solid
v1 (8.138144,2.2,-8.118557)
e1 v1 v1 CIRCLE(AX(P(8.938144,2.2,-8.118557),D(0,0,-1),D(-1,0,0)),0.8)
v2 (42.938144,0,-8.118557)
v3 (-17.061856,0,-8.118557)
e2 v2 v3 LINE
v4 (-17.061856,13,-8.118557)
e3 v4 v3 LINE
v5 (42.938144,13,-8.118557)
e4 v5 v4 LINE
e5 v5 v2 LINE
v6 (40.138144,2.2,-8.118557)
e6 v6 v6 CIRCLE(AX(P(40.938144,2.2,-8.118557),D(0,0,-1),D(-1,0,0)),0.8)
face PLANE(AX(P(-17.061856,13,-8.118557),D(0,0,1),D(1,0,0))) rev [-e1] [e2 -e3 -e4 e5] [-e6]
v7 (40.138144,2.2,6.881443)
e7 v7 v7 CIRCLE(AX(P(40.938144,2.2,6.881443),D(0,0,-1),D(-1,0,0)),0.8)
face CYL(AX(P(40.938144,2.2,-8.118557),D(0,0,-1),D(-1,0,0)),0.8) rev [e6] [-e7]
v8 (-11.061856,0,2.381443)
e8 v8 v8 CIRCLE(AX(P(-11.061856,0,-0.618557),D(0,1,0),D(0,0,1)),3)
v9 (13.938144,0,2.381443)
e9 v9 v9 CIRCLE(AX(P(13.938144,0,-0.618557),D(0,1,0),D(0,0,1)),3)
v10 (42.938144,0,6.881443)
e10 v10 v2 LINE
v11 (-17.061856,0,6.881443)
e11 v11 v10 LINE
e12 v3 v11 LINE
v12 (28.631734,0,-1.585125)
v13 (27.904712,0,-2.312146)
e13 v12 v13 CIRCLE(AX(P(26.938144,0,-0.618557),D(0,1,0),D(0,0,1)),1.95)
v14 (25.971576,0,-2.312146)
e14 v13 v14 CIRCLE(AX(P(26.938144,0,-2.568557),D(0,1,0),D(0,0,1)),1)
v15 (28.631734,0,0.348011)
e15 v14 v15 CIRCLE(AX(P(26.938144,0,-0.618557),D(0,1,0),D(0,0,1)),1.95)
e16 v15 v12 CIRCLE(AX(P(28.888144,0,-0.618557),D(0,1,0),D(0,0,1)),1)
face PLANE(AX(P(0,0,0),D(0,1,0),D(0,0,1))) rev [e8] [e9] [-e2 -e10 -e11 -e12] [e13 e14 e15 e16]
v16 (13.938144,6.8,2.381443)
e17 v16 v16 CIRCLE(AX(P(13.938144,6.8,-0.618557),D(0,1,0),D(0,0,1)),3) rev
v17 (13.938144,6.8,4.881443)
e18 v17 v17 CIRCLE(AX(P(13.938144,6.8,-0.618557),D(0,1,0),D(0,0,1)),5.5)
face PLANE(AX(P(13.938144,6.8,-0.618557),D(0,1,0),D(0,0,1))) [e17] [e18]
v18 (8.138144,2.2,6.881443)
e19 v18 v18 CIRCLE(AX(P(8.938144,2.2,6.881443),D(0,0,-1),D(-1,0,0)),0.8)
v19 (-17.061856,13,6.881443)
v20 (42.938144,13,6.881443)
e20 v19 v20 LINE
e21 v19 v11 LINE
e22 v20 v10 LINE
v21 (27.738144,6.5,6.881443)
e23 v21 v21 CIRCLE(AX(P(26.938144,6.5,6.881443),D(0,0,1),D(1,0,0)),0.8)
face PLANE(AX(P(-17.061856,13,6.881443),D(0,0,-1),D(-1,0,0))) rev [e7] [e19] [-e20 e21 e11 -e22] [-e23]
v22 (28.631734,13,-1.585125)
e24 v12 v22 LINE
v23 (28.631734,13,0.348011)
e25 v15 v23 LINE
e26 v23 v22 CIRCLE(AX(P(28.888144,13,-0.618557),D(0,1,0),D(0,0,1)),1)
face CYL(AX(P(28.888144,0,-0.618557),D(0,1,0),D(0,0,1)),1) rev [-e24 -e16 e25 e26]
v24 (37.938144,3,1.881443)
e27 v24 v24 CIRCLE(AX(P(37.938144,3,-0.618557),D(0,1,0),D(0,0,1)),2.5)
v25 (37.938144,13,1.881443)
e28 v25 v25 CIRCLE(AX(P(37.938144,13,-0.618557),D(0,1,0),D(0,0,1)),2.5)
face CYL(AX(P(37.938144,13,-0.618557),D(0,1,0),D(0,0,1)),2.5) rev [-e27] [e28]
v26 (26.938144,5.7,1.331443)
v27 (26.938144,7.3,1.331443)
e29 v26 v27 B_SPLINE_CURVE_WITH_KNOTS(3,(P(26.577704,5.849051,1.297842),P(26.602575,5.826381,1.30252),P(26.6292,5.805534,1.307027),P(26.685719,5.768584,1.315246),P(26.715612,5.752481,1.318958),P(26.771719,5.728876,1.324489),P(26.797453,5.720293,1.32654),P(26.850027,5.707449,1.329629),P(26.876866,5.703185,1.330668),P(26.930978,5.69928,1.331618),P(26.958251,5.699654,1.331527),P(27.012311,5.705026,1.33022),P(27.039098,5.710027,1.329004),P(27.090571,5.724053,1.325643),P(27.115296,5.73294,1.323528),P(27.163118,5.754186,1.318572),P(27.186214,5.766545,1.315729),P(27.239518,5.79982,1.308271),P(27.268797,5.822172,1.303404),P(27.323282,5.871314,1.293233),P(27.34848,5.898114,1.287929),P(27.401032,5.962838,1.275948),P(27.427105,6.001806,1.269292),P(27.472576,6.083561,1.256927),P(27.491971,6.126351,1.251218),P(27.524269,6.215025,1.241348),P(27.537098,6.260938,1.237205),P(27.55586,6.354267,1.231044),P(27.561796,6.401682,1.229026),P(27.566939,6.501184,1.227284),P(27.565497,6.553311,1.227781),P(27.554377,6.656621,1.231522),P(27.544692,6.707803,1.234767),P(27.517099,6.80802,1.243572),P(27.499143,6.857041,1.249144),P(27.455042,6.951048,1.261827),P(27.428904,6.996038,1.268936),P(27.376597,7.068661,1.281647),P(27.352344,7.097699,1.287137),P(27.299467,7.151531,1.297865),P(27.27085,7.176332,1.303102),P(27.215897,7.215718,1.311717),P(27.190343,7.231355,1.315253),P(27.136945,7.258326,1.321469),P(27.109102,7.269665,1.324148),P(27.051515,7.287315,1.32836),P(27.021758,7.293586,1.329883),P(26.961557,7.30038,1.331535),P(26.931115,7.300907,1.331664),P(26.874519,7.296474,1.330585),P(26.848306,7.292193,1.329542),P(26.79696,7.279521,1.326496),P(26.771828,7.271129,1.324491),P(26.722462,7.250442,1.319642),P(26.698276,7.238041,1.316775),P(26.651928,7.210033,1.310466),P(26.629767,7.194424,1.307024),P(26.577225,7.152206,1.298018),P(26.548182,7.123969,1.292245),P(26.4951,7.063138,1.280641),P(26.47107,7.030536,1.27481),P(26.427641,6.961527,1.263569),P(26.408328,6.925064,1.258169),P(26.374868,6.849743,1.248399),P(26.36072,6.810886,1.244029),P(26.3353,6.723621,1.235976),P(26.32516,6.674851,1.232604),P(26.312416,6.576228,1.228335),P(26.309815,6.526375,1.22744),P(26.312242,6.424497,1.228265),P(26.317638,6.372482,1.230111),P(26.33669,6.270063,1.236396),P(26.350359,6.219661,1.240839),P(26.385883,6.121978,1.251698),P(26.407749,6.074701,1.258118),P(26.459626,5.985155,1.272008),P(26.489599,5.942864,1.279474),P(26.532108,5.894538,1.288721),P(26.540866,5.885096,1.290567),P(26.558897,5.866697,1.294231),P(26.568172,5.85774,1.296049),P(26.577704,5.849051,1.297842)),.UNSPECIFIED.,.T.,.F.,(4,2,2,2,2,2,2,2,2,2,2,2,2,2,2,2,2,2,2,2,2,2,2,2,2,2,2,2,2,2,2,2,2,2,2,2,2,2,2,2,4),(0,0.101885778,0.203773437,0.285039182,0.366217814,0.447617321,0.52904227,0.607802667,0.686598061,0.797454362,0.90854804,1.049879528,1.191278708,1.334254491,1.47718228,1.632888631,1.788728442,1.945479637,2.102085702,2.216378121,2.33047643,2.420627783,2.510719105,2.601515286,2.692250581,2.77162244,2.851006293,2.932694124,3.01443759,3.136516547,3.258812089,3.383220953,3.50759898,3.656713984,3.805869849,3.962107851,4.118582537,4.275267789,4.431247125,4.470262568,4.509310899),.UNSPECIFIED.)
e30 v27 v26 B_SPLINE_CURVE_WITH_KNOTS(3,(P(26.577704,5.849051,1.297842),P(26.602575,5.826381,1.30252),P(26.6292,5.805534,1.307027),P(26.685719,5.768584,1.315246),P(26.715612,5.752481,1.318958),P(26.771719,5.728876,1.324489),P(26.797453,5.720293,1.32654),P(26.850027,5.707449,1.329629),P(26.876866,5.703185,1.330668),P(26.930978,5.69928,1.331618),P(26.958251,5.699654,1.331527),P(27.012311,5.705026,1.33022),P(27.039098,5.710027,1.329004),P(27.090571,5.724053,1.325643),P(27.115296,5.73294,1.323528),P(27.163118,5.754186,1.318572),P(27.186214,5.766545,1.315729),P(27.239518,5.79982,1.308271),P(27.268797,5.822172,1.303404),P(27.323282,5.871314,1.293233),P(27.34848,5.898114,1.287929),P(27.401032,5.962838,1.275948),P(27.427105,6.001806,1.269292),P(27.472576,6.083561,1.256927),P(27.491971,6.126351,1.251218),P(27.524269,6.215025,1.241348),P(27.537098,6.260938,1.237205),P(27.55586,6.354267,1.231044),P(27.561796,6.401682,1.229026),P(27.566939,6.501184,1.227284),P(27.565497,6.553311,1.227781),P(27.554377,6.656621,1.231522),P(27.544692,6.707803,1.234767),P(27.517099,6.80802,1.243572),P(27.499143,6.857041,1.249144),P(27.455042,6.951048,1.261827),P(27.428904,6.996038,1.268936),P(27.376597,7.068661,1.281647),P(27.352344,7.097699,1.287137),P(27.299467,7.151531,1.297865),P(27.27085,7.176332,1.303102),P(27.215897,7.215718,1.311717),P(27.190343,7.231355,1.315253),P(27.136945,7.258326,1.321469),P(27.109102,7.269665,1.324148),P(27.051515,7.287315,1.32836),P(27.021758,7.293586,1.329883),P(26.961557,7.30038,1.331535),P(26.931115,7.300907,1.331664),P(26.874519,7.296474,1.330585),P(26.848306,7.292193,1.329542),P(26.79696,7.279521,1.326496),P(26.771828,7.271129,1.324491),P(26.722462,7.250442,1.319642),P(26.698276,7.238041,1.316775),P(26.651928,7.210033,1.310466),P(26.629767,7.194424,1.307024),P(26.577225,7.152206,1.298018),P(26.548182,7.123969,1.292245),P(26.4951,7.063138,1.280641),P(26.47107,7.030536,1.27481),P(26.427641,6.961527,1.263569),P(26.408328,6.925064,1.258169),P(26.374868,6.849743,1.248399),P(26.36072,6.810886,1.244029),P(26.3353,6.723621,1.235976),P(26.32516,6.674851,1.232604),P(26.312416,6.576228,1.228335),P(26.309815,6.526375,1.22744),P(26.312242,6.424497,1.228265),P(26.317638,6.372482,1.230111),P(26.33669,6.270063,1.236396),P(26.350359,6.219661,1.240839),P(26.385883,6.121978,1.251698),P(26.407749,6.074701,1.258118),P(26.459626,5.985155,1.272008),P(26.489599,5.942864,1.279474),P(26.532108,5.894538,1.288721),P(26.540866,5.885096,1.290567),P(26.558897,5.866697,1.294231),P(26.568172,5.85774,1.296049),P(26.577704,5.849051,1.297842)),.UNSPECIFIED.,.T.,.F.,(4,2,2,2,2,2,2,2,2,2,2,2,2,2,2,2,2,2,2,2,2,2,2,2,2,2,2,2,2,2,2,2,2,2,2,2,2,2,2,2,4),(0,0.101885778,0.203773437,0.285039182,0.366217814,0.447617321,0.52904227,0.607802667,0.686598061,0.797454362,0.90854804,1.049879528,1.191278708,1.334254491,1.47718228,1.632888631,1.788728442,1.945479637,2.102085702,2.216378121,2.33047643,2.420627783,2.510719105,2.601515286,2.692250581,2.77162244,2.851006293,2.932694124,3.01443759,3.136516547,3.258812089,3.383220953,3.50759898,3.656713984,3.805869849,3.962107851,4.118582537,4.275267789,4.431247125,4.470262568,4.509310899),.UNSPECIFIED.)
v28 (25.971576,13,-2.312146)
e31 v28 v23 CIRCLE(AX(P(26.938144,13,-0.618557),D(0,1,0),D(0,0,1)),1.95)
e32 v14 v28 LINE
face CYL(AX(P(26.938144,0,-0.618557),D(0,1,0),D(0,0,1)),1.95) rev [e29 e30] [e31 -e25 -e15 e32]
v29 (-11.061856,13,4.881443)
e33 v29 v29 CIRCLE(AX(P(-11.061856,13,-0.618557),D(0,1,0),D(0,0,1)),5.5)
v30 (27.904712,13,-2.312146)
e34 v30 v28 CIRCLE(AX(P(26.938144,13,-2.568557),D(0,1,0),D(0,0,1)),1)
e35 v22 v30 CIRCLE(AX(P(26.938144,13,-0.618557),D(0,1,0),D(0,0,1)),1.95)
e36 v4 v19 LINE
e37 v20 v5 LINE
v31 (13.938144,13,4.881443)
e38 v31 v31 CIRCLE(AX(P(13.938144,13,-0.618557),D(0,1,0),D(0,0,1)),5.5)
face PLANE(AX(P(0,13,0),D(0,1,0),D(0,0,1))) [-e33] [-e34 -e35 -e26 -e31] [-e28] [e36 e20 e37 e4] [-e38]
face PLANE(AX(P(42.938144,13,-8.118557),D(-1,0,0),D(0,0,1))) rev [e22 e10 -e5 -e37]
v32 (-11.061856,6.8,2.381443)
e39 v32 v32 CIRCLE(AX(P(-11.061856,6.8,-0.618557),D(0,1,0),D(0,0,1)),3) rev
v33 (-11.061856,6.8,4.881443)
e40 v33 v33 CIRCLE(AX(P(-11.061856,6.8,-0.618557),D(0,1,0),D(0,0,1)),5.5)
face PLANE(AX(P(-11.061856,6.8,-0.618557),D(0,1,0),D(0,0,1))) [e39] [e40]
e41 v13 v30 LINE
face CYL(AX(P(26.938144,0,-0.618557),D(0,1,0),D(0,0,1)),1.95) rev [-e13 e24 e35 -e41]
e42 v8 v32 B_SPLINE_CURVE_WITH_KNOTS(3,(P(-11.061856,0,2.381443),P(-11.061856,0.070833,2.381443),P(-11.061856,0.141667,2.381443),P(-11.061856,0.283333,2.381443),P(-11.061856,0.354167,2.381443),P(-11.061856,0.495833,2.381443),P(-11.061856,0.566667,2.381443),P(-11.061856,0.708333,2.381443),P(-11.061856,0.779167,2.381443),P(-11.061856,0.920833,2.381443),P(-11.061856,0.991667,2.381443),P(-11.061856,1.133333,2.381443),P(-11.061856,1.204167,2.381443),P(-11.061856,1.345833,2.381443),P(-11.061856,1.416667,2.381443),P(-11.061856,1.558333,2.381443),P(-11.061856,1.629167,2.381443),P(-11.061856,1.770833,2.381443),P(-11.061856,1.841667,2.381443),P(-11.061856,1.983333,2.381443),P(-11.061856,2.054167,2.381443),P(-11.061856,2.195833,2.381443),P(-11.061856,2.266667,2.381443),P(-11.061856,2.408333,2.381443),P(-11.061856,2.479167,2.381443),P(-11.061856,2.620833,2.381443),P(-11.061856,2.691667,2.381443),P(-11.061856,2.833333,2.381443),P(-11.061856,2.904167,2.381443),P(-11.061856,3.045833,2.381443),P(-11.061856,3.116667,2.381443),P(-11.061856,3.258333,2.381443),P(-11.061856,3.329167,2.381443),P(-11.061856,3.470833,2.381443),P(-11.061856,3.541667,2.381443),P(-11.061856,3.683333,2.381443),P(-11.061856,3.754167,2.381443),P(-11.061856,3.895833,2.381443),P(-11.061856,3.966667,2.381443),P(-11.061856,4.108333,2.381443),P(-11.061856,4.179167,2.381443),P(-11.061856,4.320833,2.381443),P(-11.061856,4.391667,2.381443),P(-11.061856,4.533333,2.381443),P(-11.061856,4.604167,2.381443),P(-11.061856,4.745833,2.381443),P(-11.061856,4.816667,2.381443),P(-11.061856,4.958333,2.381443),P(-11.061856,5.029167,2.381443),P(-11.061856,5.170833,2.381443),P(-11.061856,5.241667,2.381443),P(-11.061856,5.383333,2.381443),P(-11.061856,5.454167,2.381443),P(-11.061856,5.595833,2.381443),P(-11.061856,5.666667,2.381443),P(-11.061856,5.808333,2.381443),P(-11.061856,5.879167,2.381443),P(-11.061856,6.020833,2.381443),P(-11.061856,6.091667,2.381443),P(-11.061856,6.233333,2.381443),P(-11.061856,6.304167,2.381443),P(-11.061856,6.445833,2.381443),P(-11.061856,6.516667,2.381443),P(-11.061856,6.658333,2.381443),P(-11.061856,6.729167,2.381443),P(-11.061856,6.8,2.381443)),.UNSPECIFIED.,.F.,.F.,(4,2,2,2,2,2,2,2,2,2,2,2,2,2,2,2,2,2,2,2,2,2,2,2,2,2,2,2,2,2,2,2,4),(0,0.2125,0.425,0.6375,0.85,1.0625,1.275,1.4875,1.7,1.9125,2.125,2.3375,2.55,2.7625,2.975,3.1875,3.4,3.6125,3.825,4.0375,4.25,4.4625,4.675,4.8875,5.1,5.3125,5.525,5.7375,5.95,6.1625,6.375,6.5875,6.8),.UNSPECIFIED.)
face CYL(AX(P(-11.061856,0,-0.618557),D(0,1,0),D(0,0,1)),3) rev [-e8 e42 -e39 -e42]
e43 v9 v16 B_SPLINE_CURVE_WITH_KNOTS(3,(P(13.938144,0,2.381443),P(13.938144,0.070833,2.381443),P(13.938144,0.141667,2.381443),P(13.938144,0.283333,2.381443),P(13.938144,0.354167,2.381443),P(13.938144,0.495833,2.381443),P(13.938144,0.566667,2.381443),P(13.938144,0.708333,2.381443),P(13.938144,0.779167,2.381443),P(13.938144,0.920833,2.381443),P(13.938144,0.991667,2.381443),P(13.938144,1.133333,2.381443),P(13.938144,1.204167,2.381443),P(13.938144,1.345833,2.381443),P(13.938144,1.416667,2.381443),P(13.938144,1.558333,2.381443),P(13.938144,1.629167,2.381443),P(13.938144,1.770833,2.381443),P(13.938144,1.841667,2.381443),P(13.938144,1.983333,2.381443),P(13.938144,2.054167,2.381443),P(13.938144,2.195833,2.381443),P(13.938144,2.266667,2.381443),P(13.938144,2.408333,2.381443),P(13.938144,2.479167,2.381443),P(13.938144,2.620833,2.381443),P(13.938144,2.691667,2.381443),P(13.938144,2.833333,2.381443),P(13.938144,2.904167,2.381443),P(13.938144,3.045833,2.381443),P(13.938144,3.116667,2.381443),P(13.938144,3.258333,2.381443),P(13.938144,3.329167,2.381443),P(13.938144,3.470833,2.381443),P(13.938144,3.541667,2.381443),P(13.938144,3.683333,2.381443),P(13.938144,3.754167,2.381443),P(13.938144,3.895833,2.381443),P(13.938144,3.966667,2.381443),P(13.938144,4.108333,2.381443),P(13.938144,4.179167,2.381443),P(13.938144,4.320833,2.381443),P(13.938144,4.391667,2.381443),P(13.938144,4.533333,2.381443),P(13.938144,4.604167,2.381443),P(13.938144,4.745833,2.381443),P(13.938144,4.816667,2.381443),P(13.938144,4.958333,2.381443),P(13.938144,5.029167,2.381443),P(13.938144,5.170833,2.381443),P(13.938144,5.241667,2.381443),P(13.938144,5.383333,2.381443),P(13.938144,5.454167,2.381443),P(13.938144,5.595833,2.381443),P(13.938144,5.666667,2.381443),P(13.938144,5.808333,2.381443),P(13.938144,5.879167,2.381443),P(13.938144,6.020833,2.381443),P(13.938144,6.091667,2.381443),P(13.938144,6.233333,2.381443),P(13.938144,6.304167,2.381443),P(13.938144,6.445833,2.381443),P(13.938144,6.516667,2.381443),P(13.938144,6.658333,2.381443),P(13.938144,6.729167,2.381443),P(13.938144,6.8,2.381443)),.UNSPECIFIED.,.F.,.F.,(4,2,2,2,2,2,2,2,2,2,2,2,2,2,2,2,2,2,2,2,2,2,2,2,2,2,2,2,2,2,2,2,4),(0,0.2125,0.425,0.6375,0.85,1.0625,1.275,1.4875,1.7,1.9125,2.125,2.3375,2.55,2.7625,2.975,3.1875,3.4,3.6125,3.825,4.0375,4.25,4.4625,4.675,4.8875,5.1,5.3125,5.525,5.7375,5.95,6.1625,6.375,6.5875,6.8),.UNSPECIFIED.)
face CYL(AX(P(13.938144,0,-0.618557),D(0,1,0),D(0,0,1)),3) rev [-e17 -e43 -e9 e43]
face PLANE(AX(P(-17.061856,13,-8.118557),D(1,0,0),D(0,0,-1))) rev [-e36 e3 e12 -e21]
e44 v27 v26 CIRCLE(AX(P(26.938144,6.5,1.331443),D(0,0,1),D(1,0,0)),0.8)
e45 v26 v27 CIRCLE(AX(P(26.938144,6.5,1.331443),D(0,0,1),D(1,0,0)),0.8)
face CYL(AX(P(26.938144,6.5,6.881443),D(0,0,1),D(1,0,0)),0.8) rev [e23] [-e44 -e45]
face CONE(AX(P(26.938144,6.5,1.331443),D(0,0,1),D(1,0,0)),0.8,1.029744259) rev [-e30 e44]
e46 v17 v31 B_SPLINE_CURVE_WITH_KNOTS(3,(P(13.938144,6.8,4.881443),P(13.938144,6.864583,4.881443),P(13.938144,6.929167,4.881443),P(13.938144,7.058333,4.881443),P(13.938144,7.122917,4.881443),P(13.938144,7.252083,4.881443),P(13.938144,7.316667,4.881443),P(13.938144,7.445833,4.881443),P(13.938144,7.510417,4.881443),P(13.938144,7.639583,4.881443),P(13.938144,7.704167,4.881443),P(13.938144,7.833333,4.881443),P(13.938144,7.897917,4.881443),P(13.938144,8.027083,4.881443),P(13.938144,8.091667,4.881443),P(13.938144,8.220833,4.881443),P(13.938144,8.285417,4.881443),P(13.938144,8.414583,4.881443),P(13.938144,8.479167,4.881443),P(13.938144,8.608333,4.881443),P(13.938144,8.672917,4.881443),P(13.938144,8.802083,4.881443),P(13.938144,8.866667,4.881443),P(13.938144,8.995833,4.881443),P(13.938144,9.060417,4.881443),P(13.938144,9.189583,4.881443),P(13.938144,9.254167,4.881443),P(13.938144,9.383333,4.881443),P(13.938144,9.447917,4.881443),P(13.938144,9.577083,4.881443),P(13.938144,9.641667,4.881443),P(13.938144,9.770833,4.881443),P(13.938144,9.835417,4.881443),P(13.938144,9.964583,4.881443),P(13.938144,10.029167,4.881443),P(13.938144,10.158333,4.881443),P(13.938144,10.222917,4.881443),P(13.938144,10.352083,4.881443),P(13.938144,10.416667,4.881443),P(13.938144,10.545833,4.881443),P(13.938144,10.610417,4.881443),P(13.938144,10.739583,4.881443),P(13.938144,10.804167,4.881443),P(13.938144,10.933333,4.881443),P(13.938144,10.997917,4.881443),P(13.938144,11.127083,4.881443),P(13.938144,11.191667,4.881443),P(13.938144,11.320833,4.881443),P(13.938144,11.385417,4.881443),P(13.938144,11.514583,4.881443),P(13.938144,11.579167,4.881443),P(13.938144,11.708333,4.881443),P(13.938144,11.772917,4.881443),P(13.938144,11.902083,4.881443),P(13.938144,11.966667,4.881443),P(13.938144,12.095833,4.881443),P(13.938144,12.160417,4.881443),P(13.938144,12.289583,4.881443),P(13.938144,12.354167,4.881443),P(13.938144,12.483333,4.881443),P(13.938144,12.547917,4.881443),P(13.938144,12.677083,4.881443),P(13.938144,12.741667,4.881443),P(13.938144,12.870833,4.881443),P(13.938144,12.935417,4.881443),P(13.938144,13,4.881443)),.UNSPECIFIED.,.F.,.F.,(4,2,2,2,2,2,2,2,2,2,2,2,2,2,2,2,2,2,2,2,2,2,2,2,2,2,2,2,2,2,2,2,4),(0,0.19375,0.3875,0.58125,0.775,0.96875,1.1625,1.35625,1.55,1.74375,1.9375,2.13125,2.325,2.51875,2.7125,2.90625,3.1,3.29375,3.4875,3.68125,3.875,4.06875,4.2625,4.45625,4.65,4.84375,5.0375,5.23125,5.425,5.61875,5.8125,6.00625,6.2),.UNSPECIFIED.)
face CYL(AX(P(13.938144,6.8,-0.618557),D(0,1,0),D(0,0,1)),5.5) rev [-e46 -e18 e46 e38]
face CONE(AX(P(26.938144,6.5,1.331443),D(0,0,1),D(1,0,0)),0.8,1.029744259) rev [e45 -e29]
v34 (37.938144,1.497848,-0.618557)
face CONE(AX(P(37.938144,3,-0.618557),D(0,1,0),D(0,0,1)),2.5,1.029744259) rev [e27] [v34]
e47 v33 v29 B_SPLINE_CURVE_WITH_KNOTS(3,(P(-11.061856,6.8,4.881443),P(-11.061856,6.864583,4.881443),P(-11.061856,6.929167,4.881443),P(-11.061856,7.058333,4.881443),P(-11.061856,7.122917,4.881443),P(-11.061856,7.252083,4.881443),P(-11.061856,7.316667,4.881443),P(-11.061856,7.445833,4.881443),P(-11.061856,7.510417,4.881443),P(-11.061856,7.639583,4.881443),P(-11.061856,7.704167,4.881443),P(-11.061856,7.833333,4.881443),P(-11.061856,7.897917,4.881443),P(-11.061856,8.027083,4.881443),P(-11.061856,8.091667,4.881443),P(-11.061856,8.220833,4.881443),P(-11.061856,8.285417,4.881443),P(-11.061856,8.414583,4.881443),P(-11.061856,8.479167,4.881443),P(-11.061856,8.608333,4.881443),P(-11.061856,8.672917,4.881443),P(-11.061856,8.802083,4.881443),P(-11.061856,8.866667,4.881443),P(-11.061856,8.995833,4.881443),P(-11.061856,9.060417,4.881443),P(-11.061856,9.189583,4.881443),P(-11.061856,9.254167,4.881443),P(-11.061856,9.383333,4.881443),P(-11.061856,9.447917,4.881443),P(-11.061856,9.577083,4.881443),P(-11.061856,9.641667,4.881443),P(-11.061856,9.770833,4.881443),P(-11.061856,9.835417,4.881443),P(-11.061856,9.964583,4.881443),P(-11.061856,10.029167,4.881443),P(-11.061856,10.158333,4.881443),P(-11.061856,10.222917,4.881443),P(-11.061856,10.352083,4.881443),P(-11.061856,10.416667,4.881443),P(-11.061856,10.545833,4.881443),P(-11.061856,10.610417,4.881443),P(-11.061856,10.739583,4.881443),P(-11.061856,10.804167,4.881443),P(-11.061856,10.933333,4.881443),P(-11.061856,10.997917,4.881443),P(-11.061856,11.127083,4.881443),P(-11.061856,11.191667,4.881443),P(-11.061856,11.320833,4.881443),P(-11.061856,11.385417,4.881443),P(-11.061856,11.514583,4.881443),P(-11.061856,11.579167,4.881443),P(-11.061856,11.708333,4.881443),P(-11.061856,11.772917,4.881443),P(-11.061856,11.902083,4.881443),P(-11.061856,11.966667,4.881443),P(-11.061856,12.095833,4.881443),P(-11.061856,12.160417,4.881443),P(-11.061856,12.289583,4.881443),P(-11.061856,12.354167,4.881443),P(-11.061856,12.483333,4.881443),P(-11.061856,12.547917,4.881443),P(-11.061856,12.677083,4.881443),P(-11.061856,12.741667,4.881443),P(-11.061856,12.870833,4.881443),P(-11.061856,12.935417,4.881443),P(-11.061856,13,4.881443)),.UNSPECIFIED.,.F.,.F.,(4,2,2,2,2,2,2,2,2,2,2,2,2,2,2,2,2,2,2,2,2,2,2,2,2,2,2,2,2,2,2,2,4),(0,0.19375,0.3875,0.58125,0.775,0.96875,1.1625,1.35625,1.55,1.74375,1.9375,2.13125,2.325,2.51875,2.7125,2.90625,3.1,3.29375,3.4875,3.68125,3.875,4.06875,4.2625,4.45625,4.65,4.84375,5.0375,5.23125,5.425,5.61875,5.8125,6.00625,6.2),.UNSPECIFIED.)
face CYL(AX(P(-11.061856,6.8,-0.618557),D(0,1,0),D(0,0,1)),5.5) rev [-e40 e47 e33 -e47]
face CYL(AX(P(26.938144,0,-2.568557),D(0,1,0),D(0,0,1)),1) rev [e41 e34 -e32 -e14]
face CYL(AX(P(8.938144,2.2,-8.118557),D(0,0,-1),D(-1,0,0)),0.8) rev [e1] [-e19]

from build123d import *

# Parameters (mm, degrees)
SKETCH1_W                 = 60
SKETCH1_H                 = 15
BOSS_EXTRUDE1_DEPTH       = 13
M2X0_4_TAPPED_HOLE1_D     = 1.6
CUT_EXTRUDE1_DEPTH        = 46.591613279
M6X1_0_TAPPED_HOLE1_D     = 5
M6X1_0_TAPPED_HOLE1_DEPTH = 10
M6X1_0_TAPPED_HOLE1_TIP   = 1.502151548
SKETCH15_R                = 3
CUT_EXTRUDE2_DEPTH        = 46.591613308
SKETCH16_R                = 5.5
CUT_EXTRUDE3_DEPTH        = 6.2


# Read off the part's stored shape, not the designer's step: M2x0.4 Tapped Hole2
with BuildPart() as part:
    # Sketch1 → Boss-Extrude1 (new body)
    with BuildSketch(Plane(origin=(0, 0, 0), x_dir=(1, 0, 0), z_dir=(0, 1, 0))):
        with Locations((12.93814433, 0.618556701)):
            Rectangle(SKETCH1_W, SKETCH1_H)
    extrude(amount=BOSS_EXTRUDE1_DEPTH)

    # M2x0.4 Tapped Hole1 (through all)
    with Locations(Plane(origin=(0, 0, -8.118556701), x_dir=(-1, 0, 0), z_dir=(0, 0, -1))):
        with Locations((-40.93814433, 2.2), (-8.93814433, 2.2)):
            Hole(M2X0_4_TAPPED_HOLE1_D / 2)

    # Sketch5 → Cut-Extrude1 (cut, through all)
    with BuildSketch(Plane(origin=(0, 13, 0), x_dir=(1, 0, 0), z_dir=(0, 1, 0))):
        with BuildLine():
            ThreePointArc((28.631734073, 1.585124743), (28.317002553, 1.997414924), (27.904712372, 2.312146445))
            ThreePointArc((27.904712372, 2.312146445), (26.93814433, 3.568556701), (25.971576288, 2.312146445))
            ThreePointArc((25.971576288, 2.312146445), (25.559286107, -0.760301522), (28.631734073, -0.348011341))
            ThreePointArc((28.631734073, -0.348011341), (29.88814433, 0.618556701), (28.631734073, 1.585124743))
        make_face()
    extrude(amount=-CUT_EXTRUDE1_DEPTH, mode=Mode.SUBTRACT)

    # M2x0.4 Tapped Hole2 outline → M2x0.4 Tapped Hole2 (revolve, cut)
    with BuildSketch(Plane(origin=(26.93814433, 6.5, 0), x_dir=(1, 0, 0), z_dir=(0, -1, 0))):
        Polygon((0, 1.227710243), (0.627359351, 1.227710243), (0.8, 1.331443299), (0.8, 6.881443299), (0, 6.881443299), align=None)
    revolve(axis=Axis((26.93814433, 6.5, 0), (0, 0, 1)), mode=Mode.SUBTRACT)

    # M6x1.0 Tapped Hole1
    with Locations(Plane(origin=(0, 13, 0), x_dir=(1, 0, 0), z_dir=(0, 1, 0))):
        with Locations((37.93814433, 0.618556701)):
            Hole(M6X1_0_TAPPED_HOLE1_D / 2, depth=M6X1_0_TAPPED_HOLE1_DEPTH)
            with Locations((0, 0, -(M6X1_0_TAPPED_HOLE1_DEPTH + M6X1_0_TAPPED_HOLE1_TIP / 2))):  # 118° drill point
                Cone(0, M6X1_0_TAPPED_HOLE1_D / 2, M6X1_0_TAPPED_HOLE1_TIP, mode=Mode.SUBTRACT)

    # Sketch15 → Cut-Extrude2 (cut, through all)
    with BuildSketch(Plane(origin=(0, 13, 0), x_dir=(1, 0, 0), z_dir=(0, 1, 0))):
        with Locations(Location((-11.06185567, 0.618556701, 0), (0, 0, 270))):
            Circle(SKETCH15_R)
        with Locations(Location((13.93814433, 0.618556701, 0), (0, 0, 270))):
            Circle(SKETCH15_R)
    extrude(amount=-CUT_EXTRUDE2_DEPTH, mode=Mode.SUBTRACT)

    # Sketch16 → Cut-Extrude3 (cut)
    with BuildSketch(Plane(origin=(0, 13, 0), x_dir=(1, 0, 0), z_dir=(0, 1, 0))):
        with Locations(Location((-11.06185567, 0.618556701, 0), (0, 0, 270))):
            Circle(SKETCH16_R)
        with Locations(Location((13.93814433, 0.618556701, 0), (0, 0, 270))):
            Circle(SKETCH16_R)
    extrude(amount=-CUT_EXTRUDE3_DEPTH, mode=Mode.SUBTRACT)


solid = part.part
